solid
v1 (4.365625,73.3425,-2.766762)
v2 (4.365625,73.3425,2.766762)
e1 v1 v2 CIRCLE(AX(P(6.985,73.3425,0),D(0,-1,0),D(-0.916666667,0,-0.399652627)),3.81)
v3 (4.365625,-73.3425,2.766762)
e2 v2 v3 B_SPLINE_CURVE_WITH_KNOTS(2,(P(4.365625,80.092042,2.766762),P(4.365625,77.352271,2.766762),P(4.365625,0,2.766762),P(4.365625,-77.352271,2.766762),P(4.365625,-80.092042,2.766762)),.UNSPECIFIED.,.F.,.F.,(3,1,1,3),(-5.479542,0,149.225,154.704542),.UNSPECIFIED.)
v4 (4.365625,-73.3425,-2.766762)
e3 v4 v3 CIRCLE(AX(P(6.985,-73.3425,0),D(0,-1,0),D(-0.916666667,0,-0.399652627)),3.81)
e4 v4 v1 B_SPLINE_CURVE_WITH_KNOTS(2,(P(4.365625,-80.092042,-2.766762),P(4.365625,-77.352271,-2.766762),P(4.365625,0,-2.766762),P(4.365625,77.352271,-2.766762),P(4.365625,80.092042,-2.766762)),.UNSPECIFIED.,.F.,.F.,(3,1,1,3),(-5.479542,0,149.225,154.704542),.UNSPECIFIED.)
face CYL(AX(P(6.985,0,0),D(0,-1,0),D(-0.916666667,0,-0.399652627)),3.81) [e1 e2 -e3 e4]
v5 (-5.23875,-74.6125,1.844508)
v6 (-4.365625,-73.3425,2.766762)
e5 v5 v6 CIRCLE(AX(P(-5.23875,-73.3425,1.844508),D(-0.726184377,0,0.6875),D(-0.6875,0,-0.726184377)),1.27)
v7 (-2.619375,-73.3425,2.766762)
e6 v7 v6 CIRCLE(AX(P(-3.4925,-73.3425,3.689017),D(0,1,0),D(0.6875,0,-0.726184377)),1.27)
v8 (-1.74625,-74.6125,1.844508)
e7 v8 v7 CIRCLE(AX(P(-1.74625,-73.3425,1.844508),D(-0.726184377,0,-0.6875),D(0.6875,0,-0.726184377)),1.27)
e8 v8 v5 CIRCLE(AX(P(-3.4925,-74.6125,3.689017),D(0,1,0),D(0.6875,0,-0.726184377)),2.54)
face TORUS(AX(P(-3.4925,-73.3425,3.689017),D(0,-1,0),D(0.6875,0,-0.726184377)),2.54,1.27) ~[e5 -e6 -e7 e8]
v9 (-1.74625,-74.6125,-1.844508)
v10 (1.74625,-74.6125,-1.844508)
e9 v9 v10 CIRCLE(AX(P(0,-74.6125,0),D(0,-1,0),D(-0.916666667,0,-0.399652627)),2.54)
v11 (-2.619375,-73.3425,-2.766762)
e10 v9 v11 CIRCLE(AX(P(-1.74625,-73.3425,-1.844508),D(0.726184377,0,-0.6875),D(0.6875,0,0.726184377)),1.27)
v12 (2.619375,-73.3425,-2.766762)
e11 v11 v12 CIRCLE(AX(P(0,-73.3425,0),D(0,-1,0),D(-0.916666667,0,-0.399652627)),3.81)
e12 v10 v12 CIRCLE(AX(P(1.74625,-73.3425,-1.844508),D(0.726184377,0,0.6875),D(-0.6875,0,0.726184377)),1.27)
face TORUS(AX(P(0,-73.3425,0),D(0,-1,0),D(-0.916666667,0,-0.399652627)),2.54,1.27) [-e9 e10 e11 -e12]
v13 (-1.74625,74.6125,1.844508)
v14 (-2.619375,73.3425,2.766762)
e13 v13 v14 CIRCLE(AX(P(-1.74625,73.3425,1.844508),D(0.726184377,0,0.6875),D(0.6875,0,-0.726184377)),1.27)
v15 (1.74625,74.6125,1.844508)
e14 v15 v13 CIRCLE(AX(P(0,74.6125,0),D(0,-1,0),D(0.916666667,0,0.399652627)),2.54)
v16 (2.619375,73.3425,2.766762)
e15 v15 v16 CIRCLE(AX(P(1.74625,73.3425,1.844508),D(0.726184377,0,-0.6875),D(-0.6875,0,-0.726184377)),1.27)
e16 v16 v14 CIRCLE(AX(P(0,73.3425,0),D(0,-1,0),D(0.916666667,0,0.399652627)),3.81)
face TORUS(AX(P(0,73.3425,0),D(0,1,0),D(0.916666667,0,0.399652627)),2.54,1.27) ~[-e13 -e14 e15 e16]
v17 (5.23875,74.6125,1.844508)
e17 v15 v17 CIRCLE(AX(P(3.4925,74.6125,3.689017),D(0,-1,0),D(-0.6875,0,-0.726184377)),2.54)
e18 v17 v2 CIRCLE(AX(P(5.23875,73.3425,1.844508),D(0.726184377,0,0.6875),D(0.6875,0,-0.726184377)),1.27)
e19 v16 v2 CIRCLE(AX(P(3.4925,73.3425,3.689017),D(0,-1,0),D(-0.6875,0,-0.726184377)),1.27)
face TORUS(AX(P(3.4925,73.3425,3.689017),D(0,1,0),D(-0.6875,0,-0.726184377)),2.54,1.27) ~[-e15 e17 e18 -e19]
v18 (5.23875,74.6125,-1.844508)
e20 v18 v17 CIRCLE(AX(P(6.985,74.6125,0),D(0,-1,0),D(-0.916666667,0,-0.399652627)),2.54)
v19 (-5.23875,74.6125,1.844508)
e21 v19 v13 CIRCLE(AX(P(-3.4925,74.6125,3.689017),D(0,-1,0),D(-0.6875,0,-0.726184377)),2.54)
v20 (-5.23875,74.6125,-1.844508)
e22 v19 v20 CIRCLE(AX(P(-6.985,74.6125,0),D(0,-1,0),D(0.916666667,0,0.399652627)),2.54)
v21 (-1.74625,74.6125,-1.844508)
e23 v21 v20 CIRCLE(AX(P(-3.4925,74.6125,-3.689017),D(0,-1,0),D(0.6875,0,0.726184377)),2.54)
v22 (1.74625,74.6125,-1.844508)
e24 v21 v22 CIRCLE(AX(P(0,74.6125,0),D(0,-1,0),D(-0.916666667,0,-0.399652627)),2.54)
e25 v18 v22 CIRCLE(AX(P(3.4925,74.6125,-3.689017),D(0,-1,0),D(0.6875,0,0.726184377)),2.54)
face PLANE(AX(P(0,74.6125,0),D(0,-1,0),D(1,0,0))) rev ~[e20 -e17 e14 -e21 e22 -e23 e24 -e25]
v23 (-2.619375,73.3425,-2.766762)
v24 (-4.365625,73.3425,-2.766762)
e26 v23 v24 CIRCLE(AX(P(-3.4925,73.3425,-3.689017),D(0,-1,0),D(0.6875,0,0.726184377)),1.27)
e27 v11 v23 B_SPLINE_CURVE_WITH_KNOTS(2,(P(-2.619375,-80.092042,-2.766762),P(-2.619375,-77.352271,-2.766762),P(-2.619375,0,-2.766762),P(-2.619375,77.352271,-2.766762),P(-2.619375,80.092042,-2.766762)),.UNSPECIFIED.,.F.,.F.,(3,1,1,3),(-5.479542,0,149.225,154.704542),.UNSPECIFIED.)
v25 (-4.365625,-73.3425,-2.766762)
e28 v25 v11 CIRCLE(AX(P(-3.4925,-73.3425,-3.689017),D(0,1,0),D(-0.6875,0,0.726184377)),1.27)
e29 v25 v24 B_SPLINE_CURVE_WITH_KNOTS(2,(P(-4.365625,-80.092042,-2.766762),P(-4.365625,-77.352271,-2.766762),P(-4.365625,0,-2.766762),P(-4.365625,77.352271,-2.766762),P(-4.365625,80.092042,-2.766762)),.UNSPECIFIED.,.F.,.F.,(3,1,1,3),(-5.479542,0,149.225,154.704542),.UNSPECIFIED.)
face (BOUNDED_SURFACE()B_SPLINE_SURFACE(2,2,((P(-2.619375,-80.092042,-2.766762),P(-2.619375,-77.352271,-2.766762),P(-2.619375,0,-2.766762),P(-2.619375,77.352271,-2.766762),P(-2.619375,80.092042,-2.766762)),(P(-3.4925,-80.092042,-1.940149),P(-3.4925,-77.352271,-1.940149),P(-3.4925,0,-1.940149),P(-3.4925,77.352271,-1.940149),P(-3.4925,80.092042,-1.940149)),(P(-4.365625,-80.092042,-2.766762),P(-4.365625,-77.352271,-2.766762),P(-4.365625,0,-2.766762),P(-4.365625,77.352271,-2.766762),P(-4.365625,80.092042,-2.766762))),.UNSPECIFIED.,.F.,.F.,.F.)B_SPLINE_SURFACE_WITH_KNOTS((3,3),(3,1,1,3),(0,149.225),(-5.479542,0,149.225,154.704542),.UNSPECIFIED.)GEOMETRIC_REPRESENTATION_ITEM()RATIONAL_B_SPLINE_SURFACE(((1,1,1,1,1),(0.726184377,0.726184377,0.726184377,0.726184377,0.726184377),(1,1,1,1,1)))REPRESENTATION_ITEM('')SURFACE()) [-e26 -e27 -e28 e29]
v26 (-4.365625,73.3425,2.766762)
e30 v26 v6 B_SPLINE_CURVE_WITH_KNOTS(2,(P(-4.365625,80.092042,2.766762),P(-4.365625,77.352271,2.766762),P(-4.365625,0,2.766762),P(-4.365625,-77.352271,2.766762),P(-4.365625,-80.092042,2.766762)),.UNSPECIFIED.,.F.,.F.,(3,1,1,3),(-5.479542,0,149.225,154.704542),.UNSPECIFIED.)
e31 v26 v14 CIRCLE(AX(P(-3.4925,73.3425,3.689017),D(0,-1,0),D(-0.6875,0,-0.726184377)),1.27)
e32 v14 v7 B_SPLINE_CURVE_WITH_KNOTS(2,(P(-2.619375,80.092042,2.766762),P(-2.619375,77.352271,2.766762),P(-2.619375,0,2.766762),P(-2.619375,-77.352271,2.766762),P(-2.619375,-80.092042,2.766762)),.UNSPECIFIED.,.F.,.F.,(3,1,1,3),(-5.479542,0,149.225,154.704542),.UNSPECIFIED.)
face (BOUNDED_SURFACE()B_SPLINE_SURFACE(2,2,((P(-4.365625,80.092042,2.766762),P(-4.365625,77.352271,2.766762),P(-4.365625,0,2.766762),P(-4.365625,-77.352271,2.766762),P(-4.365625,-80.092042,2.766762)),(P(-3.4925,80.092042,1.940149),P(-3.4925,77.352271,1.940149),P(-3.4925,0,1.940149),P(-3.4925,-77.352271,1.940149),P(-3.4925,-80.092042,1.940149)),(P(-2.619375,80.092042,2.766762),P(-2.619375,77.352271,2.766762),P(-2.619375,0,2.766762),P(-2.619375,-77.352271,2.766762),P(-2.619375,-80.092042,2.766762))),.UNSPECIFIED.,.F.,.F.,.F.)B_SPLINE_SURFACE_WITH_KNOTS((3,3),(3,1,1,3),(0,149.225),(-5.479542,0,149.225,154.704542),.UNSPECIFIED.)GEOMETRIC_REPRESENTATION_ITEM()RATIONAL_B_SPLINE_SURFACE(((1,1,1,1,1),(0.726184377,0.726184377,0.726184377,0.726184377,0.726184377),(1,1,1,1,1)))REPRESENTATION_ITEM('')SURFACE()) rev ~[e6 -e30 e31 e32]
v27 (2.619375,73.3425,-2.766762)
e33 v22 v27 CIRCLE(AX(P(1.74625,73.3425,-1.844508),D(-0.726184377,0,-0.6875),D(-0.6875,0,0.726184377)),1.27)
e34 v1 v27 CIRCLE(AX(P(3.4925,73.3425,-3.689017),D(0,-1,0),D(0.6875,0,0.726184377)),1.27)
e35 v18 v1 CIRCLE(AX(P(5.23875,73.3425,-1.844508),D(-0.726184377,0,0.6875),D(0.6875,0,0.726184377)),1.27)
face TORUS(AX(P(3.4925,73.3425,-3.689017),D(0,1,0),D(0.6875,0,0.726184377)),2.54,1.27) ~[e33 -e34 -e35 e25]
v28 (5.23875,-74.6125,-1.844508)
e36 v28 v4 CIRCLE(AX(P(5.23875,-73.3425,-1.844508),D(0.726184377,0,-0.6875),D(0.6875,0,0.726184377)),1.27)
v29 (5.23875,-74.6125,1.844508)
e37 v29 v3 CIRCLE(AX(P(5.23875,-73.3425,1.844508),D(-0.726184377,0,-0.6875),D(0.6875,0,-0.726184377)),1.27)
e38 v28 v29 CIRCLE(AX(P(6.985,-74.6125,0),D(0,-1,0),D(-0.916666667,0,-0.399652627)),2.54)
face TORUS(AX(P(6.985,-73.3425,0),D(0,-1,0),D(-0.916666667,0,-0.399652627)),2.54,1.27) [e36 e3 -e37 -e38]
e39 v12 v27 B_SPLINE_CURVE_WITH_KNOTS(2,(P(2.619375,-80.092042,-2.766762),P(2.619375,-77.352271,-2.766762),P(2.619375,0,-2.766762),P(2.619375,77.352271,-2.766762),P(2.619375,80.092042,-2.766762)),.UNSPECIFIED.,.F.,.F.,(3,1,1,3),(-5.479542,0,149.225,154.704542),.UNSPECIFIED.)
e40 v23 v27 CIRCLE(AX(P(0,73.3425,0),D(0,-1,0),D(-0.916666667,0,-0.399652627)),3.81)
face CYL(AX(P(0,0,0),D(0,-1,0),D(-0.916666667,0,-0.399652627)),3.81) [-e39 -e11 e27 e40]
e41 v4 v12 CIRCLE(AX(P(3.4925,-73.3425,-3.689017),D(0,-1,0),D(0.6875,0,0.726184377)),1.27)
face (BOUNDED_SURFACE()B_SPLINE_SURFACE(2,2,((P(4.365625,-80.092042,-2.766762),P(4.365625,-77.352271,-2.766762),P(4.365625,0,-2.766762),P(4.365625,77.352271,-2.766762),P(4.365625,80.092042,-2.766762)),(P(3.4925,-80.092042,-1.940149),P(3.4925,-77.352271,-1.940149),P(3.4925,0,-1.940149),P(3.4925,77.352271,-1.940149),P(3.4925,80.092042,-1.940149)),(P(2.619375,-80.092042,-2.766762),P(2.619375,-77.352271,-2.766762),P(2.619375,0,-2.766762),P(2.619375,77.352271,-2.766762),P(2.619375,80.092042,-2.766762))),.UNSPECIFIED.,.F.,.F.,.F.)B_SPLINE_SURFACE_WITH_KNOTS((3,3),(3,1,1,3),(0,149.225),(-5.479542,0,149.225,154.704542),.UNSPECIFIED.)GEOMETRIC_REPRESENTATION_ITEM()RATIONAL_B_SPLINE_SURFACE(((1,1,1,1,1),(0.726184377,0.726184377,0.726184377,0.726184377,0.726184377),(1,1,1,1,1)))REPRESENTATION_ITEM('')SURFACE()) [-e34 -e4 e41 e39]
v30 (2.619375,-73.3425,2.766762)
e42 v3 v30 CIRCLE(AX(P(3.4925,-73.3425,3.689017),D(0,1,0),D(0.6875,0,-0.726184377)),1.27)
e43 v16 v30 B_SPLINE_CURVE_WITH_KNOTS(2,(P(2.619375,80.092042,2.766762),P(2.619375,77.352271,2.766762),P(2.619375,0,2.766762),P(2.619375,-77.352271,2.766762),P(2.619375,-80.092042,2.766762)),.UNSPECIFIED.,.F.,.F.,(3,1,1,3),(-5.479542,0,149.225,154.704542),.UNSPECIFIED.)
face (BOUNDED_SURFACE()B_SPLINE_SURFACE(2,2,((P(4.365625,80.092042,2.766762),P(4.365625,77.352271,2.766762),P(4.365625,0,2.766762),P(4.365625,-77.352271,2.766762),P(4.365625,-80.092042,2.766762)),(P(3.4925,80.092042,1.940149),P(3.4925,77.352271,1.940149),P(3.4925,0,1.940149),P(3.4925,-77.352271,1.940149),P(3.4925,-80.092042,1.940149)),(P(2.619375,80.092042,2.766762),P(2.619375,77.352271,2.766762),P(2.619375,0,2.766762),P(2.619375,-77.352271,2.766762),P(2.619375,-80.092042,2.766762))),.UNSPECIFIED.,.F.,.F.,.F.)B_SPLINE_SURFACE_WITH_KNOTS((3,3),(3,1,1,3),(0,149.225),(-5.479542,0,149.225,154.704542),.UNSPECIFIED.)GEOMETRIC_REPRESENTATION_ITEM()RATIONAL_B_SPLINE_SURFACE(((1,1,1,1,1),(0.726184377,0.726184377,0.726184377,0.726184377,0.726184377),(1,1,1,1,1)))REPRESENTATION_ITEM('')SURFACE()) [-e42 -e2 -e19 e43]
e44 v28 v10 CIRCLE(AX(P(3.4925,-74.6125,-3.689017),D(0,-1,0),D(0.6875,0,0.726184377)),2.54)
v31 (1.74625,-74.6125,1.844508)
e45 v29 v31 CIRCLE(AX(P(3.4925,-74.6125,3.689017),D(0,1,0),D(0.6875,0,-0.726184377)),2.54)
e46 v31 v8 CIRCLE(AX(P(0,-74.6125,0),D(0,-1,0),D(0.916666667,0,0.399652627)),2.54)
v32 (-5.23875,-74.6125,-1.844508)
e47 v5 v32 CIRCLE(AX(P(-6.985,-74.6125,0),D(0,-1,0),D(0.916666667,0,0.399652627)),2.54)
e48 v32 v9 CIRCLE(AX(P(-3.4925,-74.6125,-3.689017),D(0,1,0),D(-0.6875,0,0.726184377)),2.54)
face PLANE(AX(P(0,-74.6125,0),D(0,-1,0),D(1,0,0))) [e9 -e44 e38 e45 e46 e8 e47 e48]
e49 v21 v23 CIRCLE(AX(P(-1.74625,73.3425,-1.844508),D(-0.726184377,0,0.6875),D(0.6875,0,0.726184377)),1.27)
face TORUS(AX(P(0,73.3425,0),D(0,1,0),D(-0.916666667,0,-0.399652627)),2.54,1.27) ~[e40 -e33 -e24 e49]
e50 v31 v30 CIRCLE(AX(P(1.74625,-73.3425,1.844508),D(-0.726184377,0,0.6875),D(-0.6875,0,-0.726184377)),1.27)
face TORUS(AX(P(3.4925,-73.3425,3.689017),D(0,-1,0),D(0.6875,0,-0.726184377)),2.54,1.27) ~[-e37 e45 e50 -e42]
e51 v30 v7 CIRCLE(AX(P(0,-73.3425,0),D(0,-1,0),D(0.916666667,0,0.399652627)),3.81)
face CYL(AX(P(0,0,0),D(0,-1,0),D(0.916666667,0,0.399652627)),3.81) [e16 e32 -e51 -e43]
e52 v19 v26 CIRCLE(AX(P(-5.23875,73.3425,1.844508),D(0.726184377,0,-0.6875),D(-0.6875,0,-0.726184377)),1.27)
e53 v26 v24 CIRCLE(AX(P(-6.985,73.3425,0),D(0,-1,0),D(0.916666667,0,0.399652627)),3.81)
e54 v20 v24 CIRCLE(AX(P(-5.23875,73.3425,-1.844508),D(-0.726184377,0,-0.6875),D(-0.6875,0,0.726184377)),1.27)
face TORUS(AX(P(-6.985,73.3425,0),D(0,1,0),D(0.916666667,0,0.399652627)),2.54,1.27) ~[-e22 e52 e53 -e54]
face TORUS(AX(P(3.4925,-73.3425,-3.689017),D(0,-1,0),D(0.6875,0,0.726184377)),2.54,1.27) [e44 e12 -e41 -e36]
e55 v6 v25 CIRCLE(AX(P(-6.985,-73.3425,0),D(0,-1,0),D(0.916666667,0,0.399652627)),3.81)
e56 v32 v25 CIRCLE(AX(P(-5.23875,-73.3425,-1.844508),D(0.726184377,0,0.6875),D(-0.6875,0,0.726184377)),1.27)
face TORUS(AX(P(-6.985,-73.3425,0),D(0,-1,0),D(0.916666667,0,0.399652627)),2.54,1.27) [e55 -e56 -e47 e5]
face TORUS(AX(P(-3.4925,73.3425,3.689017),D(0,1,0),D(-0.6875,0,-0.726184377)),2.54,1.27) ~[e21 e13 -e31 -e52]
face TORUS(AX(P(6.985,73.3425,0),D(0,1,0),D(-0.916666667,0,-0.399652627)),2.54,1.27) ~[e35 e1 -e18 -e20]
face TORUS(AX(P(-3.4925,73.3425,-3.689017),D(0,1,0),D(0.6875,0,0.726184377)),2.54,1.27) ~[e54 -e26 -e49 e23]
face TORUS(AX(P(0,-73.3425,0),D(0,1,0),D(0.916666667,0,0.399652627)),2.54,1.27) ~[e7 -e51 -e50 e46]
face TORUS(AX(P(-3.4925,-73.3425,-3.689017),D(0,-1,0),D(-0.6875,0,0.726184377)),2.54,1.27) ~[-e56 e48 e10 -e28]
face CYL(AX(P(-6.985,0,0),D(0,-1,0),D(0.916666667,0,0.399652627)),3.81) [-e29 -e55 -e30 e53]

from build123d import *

# Parameters (mm, degrees)
F1_DEPTH = 74.6125
F2_R     = 1.27


with BuildPart() as f1:
    # F0 (on Front) → F1 (new body, symmetric)
    with BuildSketch(Plane.XZ):
        with BuildLine():
            ThreePointArc((3.4925, -1.5226765087), (10.795, 0), (3.4925, 1.5226765087))
            ThreePointArc((3.4925, 1.5226765087), (0, 3.81), (-3.4925, 1.5226765087))
            ThreePointArc((-3.4925, 1.5226765087), (-10.795, 0), (-3.4925, -1.5226765087))
            ThreePointArc((-3.4925, -1.5226765087), (0, -3.81), (3.4925, -1.5226765087))
        make_face()
    extrude(amount=F1_DEPTH, both=True)

    # F2
    f2_edges = [f1.edges().sort_by_distance(p)[0] for p in [
        (3.4925, 0, -1.522677),
        (10.795, 74.6125, 0),
        (3.4925, 0, 1.522677),
        (10.795, -74.6125, 0),
        (0, 74.6125, 3.81),
        (-3.4925, 0, 1.522677),
        (0, -74.6125, 3.81),
        (-10.795, 74.6125, 0),
        (-3.4925, 0, -1.522677),
        (-10.795, -74.6125, 0),
        (0, 74.6125, -3.81),
        (0, -74.6125, -3.81),
    ]]
    fillet(f2_edges, radius=F2_R)


solid = f1.part
